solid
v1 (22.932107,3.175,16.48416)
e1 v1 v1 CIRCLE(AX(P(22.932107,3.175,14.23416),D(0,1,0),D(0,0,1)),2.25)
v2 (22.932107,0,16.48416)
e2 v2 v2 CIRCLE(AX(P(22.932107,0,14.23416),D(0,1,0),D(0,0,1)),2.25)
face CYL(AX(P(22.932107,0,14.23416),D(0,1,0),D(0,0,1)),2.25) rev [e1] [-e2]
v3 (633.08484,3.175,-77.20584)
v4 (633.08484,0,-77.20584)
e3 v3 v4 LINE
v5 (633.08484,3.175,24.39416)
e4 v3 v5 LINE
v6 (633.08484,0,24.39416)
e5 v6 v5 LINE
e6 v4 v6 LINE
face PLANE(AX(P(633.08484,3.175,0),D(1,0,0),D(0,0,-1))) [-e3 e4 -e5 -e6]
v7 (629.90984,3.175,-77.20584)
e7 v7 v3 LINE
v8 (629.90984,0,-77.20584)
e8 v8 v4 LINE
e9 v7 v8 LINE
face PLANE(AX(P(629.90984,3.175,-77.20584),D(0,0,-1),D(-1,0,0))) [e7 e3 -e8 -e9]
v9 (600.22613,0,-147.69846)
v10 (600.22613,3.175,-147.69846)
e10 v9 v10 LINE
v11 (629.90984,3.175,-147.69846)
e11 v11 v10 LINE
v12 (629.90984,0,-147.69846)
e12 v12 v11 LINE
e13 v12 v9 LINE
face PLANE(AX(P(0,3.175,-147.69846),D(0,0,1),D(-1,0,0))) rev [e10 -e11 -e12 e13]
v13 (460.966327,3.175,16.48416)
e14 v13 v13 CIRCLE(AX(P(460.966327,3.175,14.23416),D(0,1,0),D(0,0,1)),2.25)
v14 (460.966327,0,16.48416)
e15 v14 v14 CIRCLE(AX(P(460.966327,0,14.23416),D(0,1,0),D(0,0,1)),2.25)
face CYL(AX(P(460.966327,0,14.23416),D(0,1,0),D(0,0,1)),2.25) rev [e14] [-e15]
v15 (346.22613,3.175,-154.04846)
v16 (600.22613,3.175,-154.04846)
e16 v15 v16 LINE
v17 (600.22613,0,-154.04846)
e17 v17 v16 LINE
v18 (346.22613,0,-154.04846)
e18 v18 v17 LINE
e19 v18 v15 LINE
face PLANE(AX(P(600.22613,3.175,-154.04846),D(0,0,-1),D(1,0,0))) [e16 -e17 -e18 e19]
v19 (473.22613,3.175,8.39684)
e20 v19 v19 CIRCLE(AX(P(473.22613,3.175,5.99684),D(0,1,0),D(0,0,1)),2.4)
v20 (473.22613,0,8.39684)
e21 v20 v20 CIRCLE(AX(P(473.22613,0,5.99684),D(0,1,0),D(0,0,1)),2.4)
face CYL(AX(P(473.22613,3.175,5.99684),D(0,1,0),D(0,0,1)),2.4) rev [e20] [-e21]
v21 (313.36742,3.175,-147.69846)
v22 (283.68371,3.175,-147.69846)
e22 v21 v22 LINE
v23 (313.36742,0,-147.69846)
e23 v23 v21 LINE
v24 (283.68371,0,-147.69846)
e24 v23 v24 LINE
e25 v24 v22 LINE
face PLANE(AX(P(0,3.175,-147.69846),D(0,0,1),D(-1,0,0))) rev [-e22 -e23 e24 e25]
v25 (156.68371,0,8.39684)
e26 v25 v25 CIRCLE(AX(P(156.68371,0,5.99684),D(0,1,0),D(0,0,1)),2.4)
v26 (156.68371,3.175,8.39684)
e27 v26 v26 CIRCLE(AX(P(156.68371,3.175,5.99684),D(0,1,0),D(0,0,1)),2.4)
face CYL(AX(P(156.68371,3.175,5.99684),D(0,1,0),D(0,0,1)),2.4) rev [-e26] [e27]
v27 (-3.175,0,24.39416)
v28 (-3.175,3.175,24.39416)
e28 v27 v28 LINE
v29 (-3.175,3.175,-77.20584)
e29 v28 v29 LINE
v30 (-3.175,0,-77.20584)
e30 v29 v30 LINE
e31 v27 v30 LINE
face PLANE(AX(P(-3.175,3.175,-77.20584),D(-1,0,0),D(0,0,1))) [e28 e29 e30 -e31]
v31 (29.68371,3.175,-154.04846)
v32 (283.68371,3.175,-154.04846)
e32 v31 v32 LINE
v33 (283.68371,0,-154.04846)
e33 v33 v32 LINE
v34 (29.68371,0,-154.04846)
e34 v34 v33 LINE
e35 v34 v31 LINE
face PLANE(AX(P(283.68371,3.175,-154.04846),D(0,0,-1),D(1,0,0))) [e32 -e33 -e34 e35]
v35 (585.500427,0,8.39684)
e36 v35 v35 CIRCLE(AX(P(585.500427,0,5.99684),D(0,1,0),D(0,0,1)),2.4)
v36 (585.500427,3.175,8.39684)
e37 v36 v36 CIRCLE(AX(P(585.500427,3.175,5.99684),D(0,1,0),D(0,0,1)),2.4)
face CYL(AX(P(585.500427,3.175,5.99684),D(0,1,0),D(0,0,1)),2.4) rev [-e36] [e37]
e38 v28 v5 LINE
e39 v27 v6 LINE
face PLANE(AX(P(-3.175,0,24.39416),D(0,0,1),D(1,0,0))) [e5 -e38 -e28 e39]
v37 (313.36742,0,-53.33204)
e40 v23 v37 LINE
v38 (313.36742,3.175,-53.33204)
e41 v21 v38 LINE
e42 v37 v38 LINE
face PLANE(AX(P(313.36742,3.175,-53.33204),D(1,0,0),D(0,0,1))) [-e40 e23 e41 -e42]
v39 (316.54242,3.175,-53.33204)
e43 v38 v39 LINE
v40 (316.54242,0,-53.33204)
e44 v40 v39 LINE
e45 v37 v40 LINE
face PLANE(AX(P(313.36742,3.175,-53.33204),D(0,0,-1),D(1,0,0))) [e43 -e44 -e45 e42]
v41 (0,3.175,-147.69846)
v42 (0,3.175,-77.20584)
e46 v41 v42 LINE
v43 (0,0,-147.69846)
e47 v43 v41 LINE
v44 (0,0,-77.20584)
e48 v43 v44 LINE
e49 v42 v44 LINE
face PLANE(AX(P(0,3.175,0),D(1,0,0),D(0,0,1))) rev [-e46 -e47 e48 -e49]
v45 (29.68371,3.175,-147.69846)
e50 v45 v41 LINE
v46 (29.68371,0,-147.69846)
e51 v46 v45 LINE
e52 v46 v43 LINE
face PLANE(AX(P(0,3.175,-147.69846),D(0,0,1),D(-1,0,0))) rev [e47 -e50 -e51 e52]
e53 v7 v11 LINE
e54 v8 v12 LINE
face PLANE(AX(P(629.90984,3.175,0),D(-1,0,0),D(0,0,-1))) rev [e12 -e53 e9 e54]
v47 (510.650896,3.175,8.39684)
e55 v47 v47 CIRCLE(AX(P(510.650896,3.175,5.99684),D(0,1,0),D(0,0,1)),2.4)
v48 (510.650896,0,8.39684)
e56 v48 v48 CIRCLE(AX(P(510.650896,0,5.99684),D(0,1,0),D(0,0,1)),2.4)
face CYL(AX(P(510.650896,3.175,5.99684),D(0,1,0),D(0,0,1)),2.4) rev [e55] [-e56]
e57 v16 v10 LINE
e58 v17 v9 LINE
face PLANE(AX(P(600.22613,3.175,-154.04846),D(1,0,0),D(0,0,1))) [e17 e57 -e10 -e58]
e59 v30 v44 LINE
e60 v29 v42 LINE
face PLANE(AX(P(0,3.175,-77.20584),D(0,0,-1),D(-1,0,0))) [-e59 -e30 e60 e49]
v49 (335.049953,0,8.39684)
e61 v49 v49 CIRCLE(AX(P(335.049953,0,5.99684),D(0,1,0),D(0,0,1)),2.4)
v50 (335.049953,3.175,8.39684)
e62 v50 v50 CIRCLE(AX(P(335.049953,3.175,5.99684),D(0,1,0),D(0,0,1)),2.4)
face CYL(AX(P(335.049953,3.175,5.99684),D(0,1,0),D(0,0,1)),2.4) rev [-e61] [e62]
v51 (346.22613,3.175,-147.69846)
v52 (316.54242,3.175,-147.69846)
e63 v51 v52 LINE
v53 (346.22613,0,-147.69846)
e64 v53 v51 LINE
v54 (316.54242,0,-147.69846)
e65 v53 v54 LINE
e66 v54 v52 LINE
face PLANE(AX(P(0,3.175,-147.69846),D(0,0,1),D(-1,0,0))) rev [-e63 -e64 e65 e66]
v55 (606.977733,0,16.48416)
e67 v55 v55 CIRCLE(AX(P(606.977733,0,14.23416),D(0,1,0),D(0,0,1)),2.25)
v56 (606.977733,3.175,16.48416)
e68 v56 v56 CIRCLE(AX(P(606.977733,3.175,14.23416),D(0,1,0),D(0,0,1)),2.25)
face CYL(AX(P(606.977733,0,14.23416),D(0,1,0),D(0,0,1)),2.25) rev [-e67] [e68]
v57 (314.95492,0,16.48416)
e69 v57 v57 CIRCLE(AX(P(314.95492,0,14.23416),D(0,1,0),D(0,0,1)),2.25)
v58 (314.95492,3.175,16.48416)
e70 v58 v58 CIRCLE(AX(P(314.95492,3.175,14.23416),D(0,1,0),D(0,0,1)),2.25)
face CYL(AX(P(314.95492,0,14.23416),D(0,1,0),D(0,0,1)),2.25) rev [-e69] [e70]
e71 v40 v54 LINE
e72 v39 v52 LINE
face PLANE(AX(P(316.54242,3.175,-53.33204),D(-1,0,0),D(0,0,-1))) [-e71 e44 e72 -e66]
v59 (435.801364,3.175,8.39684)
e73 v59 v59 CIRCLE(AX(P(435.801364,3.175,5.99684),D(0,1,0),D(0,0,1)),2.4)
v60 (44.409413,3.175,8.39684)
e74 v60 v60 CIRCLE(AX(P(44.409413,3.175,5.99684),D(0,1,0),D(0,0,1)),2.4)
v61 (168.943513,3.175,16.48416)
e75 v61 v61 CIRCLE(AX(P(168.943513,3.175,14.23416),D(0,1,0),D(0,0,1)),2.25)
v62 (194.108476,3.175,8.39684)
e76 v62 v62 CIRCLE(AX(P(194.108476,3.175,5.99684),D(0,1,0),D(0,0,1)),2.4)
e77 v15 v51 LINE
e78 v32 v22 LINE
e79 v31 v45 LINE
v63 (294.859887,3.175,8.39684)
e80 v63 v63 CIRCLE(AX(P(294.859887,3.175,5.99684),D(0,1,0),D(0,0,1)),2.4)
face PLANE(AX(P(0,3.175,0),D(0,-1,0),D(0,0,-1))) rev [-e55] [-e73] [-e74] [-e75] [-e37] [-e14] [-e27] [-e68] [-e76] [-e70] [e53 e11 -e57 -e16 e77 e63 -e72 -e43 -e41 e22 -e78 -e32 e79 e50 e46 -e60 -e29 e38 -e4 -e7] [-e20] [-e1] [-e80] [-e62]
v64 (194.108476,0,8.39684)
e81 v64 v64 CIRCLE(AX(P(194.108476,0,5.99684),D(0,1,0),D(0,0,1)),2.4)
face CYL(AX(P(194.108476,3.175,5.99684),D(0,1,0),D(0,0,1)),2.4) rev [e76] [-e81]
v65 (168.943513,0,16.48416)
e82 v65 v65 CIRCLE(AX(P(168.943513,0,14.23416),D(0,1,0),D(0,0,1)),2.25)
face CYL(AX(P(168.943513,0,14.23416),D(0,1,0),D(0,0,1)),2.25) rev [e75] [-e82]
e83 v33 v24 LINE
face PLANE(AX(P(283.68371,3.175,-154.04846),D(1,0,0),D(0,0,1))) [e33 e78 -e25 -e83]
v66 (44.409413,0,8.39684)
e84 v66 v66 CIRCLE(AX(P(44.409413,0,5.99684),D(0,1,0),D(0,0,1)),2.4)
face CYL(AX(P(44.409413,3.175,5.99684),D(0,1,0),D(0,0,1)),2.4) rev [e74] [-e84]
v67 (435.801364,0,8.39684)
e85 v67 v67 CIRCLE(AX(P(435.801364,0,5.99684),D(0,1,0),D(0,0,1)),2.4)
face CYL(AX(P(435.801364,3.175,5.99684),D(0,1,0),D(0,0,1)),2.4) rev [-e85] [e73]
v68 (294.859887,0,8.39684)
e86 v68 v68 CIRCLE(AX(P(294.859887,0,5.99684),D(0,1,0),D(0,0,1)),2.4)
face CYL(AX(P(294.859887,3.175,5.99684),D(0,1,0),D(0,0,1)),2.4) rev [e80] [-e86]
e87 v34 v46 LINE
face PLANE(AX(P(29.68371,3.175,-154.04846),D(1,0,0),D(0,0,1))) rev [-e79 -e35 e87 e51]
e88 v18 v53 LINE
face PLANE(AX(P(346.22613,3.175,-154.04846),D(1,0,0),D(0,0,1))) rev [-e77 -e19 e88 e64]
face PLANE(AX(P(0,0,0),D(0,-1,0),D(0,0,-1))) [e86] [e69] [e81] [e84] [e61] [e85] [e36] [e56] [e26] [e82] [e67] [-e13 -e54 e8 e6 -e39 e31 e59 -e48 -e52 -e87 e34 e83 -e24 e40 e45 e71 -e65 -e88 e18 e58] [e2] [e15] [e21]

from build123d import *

# Parameters (mm, degrees)
SKETCH1_W            = 629.90984
SKETCH1_H            = 147.69846
BOSS_EXTRUDE1_DEPTH  = 3.175
SKETCH3_W            = 254
SKETCH3_H            = 3.175
BOSS_EXTRUDE2_DEPTH  = 6.35
SKETCH4_W            = 3.175
SKETCH4_H            = 188.732840052
CUT_EXTRUDE1_DEPTH   = 3.175
SKETCH9_W            = 3.175
SKETCH9_H            = 77.20584
BOSS_EXTRUDE4_DEPTH  = 3.175
SKETCH10_W           = 636.25984
SKETCH10_H           = 24.39416
BOSS_EXTRUDE5_DEPTH  = 3.175
SKETCH13_R           = 2.25
CUT_EXTRUDE3_DEPTH   = 652.56536379
M4_CLEARANCE_HOLE1_D = 4.8


with BuildPart() as part:
    # Sketch1 → Boss-Extrude1 (new body)
    with BuildSketch(Plane(origin=(0, 0, 0), x_dir=(1, 0, 0), z_dir=(0, 1, 0))):
        with Locations((314.95492, 73.84923)):
            Rectangle(SKETCH1_W, SKETCH1_H)
    extrude(amount=BOSS_EXTRUDE1_DEPTH)

    # Sketch3 → Boss-Extrude2 (add)
    with BuildSketch(Plane(origin=(0, 0, -147.69846), x_dir=(-1, 0, 0), z_dir=(0, 0, -1))):
        with Locations((-473.22613, 1.5875)):
            Rectangle(SKETCH3_W, SKETCH3_H)
        with Locations((-156.68371, 1.5875)):
            Rectangle(SKETCH3_W, SKETCH3_H)
    extrude(amount=BOSS_EXTRUDE2_DEPTH)

    # Sketch4 → Cut-Extrude1 (cut)
    with BuildSketch(Plane(origin=(0, 3.175, 0), x_dir=(1, 0, 0), z_dir=(0, 1, 0))):
        with Locations((314.95492, 147.69846)):
            Rectangle(SKETCH4_W, SKETCH4_H)
    extrude(amount=-CUT_EXTRUDE1_DEPTH, mode=Mode.SUBTRACT)

    # Sketch9 → Boss-Extrude4 (add, through all)
    with BuildSketch(Plane.XZ):
        with Locations((-1.5875, -38.60292)):
            Rectangle(SKETCH9_W, SKETCH9_H)
        with Locations((631.49734, -38.60292)):
            Rectangle(SKETCH9_W, SKETCH9_H)
    extrude(amount=-BOSS_EXTRUDE4_DEPTH)

    # Sketch10 → Boss-Extrude5 (add, through all)
    with BuildSketch(Plane(origin=(0, 3.175, 0), x_dir=(1, 0, 0), z_dir=(0, 1, 0))):
        with Locations((314.95492, -12.19708)):
            Rectangle(SKETCH10_W, SKETCH10_H)
    extrude(amount=-BOSS_EXTRUDE5_DEPTH)

    # Sketch13 → Cut-Extrude3 (cut, through all)
    with BuildSketch(Plane(origin=(0, 3.175, 0), x_dir=(1, 0, 0), z_dir=(0, 1, 0))):
        with Locations(Location((606.977733219, -14.23416, 0), (0, 0, 270))):
            Circle(SKETCH13_R)
        with Locations(Location((460.966326609, -14.23416, 0), (0, 0, 270))):
            Circle(SKETCH13_R)
        with Locations(Location((314.95492, -14.23416, 0), (0, 0, 270))):
            Circle(SKETCH13_R)
        with Locations(Location((168.943513391, -14.23416, 0), (0, 0, 270))):
            Circle(SKETCH13_R)
        with Locations(Location((22.932106781, -14.23416, 0), (0, 0, 270))):
            Circle(SKETCH13_R)
    extrude(amount=-CUT_EXTRUDE3_DEPTH, mode=Mode.SUBTRACT)

    # M4 Clearance Hole1 (through all)
    with Locations(Plane(origin=(0, 3.175, 0), x_dir=(1, 0, 0), z_dir=(0, 1, 0))):
        with Locations((44.409412743, -5.996840051), (156.68371, -5.996840051), (194.108475752, -5.996840051), (294.859886505, -5.996840051), (335.049953495, -5.996840051), (435.801364248, -5.996840051), (473.22613, -5.996840051), (510.650895752, -5.996840051), (585.500427257, -5.996840051)):
            Hole(M4_CLEARANCE_HOLE1_D / 2)


solid = part.part
